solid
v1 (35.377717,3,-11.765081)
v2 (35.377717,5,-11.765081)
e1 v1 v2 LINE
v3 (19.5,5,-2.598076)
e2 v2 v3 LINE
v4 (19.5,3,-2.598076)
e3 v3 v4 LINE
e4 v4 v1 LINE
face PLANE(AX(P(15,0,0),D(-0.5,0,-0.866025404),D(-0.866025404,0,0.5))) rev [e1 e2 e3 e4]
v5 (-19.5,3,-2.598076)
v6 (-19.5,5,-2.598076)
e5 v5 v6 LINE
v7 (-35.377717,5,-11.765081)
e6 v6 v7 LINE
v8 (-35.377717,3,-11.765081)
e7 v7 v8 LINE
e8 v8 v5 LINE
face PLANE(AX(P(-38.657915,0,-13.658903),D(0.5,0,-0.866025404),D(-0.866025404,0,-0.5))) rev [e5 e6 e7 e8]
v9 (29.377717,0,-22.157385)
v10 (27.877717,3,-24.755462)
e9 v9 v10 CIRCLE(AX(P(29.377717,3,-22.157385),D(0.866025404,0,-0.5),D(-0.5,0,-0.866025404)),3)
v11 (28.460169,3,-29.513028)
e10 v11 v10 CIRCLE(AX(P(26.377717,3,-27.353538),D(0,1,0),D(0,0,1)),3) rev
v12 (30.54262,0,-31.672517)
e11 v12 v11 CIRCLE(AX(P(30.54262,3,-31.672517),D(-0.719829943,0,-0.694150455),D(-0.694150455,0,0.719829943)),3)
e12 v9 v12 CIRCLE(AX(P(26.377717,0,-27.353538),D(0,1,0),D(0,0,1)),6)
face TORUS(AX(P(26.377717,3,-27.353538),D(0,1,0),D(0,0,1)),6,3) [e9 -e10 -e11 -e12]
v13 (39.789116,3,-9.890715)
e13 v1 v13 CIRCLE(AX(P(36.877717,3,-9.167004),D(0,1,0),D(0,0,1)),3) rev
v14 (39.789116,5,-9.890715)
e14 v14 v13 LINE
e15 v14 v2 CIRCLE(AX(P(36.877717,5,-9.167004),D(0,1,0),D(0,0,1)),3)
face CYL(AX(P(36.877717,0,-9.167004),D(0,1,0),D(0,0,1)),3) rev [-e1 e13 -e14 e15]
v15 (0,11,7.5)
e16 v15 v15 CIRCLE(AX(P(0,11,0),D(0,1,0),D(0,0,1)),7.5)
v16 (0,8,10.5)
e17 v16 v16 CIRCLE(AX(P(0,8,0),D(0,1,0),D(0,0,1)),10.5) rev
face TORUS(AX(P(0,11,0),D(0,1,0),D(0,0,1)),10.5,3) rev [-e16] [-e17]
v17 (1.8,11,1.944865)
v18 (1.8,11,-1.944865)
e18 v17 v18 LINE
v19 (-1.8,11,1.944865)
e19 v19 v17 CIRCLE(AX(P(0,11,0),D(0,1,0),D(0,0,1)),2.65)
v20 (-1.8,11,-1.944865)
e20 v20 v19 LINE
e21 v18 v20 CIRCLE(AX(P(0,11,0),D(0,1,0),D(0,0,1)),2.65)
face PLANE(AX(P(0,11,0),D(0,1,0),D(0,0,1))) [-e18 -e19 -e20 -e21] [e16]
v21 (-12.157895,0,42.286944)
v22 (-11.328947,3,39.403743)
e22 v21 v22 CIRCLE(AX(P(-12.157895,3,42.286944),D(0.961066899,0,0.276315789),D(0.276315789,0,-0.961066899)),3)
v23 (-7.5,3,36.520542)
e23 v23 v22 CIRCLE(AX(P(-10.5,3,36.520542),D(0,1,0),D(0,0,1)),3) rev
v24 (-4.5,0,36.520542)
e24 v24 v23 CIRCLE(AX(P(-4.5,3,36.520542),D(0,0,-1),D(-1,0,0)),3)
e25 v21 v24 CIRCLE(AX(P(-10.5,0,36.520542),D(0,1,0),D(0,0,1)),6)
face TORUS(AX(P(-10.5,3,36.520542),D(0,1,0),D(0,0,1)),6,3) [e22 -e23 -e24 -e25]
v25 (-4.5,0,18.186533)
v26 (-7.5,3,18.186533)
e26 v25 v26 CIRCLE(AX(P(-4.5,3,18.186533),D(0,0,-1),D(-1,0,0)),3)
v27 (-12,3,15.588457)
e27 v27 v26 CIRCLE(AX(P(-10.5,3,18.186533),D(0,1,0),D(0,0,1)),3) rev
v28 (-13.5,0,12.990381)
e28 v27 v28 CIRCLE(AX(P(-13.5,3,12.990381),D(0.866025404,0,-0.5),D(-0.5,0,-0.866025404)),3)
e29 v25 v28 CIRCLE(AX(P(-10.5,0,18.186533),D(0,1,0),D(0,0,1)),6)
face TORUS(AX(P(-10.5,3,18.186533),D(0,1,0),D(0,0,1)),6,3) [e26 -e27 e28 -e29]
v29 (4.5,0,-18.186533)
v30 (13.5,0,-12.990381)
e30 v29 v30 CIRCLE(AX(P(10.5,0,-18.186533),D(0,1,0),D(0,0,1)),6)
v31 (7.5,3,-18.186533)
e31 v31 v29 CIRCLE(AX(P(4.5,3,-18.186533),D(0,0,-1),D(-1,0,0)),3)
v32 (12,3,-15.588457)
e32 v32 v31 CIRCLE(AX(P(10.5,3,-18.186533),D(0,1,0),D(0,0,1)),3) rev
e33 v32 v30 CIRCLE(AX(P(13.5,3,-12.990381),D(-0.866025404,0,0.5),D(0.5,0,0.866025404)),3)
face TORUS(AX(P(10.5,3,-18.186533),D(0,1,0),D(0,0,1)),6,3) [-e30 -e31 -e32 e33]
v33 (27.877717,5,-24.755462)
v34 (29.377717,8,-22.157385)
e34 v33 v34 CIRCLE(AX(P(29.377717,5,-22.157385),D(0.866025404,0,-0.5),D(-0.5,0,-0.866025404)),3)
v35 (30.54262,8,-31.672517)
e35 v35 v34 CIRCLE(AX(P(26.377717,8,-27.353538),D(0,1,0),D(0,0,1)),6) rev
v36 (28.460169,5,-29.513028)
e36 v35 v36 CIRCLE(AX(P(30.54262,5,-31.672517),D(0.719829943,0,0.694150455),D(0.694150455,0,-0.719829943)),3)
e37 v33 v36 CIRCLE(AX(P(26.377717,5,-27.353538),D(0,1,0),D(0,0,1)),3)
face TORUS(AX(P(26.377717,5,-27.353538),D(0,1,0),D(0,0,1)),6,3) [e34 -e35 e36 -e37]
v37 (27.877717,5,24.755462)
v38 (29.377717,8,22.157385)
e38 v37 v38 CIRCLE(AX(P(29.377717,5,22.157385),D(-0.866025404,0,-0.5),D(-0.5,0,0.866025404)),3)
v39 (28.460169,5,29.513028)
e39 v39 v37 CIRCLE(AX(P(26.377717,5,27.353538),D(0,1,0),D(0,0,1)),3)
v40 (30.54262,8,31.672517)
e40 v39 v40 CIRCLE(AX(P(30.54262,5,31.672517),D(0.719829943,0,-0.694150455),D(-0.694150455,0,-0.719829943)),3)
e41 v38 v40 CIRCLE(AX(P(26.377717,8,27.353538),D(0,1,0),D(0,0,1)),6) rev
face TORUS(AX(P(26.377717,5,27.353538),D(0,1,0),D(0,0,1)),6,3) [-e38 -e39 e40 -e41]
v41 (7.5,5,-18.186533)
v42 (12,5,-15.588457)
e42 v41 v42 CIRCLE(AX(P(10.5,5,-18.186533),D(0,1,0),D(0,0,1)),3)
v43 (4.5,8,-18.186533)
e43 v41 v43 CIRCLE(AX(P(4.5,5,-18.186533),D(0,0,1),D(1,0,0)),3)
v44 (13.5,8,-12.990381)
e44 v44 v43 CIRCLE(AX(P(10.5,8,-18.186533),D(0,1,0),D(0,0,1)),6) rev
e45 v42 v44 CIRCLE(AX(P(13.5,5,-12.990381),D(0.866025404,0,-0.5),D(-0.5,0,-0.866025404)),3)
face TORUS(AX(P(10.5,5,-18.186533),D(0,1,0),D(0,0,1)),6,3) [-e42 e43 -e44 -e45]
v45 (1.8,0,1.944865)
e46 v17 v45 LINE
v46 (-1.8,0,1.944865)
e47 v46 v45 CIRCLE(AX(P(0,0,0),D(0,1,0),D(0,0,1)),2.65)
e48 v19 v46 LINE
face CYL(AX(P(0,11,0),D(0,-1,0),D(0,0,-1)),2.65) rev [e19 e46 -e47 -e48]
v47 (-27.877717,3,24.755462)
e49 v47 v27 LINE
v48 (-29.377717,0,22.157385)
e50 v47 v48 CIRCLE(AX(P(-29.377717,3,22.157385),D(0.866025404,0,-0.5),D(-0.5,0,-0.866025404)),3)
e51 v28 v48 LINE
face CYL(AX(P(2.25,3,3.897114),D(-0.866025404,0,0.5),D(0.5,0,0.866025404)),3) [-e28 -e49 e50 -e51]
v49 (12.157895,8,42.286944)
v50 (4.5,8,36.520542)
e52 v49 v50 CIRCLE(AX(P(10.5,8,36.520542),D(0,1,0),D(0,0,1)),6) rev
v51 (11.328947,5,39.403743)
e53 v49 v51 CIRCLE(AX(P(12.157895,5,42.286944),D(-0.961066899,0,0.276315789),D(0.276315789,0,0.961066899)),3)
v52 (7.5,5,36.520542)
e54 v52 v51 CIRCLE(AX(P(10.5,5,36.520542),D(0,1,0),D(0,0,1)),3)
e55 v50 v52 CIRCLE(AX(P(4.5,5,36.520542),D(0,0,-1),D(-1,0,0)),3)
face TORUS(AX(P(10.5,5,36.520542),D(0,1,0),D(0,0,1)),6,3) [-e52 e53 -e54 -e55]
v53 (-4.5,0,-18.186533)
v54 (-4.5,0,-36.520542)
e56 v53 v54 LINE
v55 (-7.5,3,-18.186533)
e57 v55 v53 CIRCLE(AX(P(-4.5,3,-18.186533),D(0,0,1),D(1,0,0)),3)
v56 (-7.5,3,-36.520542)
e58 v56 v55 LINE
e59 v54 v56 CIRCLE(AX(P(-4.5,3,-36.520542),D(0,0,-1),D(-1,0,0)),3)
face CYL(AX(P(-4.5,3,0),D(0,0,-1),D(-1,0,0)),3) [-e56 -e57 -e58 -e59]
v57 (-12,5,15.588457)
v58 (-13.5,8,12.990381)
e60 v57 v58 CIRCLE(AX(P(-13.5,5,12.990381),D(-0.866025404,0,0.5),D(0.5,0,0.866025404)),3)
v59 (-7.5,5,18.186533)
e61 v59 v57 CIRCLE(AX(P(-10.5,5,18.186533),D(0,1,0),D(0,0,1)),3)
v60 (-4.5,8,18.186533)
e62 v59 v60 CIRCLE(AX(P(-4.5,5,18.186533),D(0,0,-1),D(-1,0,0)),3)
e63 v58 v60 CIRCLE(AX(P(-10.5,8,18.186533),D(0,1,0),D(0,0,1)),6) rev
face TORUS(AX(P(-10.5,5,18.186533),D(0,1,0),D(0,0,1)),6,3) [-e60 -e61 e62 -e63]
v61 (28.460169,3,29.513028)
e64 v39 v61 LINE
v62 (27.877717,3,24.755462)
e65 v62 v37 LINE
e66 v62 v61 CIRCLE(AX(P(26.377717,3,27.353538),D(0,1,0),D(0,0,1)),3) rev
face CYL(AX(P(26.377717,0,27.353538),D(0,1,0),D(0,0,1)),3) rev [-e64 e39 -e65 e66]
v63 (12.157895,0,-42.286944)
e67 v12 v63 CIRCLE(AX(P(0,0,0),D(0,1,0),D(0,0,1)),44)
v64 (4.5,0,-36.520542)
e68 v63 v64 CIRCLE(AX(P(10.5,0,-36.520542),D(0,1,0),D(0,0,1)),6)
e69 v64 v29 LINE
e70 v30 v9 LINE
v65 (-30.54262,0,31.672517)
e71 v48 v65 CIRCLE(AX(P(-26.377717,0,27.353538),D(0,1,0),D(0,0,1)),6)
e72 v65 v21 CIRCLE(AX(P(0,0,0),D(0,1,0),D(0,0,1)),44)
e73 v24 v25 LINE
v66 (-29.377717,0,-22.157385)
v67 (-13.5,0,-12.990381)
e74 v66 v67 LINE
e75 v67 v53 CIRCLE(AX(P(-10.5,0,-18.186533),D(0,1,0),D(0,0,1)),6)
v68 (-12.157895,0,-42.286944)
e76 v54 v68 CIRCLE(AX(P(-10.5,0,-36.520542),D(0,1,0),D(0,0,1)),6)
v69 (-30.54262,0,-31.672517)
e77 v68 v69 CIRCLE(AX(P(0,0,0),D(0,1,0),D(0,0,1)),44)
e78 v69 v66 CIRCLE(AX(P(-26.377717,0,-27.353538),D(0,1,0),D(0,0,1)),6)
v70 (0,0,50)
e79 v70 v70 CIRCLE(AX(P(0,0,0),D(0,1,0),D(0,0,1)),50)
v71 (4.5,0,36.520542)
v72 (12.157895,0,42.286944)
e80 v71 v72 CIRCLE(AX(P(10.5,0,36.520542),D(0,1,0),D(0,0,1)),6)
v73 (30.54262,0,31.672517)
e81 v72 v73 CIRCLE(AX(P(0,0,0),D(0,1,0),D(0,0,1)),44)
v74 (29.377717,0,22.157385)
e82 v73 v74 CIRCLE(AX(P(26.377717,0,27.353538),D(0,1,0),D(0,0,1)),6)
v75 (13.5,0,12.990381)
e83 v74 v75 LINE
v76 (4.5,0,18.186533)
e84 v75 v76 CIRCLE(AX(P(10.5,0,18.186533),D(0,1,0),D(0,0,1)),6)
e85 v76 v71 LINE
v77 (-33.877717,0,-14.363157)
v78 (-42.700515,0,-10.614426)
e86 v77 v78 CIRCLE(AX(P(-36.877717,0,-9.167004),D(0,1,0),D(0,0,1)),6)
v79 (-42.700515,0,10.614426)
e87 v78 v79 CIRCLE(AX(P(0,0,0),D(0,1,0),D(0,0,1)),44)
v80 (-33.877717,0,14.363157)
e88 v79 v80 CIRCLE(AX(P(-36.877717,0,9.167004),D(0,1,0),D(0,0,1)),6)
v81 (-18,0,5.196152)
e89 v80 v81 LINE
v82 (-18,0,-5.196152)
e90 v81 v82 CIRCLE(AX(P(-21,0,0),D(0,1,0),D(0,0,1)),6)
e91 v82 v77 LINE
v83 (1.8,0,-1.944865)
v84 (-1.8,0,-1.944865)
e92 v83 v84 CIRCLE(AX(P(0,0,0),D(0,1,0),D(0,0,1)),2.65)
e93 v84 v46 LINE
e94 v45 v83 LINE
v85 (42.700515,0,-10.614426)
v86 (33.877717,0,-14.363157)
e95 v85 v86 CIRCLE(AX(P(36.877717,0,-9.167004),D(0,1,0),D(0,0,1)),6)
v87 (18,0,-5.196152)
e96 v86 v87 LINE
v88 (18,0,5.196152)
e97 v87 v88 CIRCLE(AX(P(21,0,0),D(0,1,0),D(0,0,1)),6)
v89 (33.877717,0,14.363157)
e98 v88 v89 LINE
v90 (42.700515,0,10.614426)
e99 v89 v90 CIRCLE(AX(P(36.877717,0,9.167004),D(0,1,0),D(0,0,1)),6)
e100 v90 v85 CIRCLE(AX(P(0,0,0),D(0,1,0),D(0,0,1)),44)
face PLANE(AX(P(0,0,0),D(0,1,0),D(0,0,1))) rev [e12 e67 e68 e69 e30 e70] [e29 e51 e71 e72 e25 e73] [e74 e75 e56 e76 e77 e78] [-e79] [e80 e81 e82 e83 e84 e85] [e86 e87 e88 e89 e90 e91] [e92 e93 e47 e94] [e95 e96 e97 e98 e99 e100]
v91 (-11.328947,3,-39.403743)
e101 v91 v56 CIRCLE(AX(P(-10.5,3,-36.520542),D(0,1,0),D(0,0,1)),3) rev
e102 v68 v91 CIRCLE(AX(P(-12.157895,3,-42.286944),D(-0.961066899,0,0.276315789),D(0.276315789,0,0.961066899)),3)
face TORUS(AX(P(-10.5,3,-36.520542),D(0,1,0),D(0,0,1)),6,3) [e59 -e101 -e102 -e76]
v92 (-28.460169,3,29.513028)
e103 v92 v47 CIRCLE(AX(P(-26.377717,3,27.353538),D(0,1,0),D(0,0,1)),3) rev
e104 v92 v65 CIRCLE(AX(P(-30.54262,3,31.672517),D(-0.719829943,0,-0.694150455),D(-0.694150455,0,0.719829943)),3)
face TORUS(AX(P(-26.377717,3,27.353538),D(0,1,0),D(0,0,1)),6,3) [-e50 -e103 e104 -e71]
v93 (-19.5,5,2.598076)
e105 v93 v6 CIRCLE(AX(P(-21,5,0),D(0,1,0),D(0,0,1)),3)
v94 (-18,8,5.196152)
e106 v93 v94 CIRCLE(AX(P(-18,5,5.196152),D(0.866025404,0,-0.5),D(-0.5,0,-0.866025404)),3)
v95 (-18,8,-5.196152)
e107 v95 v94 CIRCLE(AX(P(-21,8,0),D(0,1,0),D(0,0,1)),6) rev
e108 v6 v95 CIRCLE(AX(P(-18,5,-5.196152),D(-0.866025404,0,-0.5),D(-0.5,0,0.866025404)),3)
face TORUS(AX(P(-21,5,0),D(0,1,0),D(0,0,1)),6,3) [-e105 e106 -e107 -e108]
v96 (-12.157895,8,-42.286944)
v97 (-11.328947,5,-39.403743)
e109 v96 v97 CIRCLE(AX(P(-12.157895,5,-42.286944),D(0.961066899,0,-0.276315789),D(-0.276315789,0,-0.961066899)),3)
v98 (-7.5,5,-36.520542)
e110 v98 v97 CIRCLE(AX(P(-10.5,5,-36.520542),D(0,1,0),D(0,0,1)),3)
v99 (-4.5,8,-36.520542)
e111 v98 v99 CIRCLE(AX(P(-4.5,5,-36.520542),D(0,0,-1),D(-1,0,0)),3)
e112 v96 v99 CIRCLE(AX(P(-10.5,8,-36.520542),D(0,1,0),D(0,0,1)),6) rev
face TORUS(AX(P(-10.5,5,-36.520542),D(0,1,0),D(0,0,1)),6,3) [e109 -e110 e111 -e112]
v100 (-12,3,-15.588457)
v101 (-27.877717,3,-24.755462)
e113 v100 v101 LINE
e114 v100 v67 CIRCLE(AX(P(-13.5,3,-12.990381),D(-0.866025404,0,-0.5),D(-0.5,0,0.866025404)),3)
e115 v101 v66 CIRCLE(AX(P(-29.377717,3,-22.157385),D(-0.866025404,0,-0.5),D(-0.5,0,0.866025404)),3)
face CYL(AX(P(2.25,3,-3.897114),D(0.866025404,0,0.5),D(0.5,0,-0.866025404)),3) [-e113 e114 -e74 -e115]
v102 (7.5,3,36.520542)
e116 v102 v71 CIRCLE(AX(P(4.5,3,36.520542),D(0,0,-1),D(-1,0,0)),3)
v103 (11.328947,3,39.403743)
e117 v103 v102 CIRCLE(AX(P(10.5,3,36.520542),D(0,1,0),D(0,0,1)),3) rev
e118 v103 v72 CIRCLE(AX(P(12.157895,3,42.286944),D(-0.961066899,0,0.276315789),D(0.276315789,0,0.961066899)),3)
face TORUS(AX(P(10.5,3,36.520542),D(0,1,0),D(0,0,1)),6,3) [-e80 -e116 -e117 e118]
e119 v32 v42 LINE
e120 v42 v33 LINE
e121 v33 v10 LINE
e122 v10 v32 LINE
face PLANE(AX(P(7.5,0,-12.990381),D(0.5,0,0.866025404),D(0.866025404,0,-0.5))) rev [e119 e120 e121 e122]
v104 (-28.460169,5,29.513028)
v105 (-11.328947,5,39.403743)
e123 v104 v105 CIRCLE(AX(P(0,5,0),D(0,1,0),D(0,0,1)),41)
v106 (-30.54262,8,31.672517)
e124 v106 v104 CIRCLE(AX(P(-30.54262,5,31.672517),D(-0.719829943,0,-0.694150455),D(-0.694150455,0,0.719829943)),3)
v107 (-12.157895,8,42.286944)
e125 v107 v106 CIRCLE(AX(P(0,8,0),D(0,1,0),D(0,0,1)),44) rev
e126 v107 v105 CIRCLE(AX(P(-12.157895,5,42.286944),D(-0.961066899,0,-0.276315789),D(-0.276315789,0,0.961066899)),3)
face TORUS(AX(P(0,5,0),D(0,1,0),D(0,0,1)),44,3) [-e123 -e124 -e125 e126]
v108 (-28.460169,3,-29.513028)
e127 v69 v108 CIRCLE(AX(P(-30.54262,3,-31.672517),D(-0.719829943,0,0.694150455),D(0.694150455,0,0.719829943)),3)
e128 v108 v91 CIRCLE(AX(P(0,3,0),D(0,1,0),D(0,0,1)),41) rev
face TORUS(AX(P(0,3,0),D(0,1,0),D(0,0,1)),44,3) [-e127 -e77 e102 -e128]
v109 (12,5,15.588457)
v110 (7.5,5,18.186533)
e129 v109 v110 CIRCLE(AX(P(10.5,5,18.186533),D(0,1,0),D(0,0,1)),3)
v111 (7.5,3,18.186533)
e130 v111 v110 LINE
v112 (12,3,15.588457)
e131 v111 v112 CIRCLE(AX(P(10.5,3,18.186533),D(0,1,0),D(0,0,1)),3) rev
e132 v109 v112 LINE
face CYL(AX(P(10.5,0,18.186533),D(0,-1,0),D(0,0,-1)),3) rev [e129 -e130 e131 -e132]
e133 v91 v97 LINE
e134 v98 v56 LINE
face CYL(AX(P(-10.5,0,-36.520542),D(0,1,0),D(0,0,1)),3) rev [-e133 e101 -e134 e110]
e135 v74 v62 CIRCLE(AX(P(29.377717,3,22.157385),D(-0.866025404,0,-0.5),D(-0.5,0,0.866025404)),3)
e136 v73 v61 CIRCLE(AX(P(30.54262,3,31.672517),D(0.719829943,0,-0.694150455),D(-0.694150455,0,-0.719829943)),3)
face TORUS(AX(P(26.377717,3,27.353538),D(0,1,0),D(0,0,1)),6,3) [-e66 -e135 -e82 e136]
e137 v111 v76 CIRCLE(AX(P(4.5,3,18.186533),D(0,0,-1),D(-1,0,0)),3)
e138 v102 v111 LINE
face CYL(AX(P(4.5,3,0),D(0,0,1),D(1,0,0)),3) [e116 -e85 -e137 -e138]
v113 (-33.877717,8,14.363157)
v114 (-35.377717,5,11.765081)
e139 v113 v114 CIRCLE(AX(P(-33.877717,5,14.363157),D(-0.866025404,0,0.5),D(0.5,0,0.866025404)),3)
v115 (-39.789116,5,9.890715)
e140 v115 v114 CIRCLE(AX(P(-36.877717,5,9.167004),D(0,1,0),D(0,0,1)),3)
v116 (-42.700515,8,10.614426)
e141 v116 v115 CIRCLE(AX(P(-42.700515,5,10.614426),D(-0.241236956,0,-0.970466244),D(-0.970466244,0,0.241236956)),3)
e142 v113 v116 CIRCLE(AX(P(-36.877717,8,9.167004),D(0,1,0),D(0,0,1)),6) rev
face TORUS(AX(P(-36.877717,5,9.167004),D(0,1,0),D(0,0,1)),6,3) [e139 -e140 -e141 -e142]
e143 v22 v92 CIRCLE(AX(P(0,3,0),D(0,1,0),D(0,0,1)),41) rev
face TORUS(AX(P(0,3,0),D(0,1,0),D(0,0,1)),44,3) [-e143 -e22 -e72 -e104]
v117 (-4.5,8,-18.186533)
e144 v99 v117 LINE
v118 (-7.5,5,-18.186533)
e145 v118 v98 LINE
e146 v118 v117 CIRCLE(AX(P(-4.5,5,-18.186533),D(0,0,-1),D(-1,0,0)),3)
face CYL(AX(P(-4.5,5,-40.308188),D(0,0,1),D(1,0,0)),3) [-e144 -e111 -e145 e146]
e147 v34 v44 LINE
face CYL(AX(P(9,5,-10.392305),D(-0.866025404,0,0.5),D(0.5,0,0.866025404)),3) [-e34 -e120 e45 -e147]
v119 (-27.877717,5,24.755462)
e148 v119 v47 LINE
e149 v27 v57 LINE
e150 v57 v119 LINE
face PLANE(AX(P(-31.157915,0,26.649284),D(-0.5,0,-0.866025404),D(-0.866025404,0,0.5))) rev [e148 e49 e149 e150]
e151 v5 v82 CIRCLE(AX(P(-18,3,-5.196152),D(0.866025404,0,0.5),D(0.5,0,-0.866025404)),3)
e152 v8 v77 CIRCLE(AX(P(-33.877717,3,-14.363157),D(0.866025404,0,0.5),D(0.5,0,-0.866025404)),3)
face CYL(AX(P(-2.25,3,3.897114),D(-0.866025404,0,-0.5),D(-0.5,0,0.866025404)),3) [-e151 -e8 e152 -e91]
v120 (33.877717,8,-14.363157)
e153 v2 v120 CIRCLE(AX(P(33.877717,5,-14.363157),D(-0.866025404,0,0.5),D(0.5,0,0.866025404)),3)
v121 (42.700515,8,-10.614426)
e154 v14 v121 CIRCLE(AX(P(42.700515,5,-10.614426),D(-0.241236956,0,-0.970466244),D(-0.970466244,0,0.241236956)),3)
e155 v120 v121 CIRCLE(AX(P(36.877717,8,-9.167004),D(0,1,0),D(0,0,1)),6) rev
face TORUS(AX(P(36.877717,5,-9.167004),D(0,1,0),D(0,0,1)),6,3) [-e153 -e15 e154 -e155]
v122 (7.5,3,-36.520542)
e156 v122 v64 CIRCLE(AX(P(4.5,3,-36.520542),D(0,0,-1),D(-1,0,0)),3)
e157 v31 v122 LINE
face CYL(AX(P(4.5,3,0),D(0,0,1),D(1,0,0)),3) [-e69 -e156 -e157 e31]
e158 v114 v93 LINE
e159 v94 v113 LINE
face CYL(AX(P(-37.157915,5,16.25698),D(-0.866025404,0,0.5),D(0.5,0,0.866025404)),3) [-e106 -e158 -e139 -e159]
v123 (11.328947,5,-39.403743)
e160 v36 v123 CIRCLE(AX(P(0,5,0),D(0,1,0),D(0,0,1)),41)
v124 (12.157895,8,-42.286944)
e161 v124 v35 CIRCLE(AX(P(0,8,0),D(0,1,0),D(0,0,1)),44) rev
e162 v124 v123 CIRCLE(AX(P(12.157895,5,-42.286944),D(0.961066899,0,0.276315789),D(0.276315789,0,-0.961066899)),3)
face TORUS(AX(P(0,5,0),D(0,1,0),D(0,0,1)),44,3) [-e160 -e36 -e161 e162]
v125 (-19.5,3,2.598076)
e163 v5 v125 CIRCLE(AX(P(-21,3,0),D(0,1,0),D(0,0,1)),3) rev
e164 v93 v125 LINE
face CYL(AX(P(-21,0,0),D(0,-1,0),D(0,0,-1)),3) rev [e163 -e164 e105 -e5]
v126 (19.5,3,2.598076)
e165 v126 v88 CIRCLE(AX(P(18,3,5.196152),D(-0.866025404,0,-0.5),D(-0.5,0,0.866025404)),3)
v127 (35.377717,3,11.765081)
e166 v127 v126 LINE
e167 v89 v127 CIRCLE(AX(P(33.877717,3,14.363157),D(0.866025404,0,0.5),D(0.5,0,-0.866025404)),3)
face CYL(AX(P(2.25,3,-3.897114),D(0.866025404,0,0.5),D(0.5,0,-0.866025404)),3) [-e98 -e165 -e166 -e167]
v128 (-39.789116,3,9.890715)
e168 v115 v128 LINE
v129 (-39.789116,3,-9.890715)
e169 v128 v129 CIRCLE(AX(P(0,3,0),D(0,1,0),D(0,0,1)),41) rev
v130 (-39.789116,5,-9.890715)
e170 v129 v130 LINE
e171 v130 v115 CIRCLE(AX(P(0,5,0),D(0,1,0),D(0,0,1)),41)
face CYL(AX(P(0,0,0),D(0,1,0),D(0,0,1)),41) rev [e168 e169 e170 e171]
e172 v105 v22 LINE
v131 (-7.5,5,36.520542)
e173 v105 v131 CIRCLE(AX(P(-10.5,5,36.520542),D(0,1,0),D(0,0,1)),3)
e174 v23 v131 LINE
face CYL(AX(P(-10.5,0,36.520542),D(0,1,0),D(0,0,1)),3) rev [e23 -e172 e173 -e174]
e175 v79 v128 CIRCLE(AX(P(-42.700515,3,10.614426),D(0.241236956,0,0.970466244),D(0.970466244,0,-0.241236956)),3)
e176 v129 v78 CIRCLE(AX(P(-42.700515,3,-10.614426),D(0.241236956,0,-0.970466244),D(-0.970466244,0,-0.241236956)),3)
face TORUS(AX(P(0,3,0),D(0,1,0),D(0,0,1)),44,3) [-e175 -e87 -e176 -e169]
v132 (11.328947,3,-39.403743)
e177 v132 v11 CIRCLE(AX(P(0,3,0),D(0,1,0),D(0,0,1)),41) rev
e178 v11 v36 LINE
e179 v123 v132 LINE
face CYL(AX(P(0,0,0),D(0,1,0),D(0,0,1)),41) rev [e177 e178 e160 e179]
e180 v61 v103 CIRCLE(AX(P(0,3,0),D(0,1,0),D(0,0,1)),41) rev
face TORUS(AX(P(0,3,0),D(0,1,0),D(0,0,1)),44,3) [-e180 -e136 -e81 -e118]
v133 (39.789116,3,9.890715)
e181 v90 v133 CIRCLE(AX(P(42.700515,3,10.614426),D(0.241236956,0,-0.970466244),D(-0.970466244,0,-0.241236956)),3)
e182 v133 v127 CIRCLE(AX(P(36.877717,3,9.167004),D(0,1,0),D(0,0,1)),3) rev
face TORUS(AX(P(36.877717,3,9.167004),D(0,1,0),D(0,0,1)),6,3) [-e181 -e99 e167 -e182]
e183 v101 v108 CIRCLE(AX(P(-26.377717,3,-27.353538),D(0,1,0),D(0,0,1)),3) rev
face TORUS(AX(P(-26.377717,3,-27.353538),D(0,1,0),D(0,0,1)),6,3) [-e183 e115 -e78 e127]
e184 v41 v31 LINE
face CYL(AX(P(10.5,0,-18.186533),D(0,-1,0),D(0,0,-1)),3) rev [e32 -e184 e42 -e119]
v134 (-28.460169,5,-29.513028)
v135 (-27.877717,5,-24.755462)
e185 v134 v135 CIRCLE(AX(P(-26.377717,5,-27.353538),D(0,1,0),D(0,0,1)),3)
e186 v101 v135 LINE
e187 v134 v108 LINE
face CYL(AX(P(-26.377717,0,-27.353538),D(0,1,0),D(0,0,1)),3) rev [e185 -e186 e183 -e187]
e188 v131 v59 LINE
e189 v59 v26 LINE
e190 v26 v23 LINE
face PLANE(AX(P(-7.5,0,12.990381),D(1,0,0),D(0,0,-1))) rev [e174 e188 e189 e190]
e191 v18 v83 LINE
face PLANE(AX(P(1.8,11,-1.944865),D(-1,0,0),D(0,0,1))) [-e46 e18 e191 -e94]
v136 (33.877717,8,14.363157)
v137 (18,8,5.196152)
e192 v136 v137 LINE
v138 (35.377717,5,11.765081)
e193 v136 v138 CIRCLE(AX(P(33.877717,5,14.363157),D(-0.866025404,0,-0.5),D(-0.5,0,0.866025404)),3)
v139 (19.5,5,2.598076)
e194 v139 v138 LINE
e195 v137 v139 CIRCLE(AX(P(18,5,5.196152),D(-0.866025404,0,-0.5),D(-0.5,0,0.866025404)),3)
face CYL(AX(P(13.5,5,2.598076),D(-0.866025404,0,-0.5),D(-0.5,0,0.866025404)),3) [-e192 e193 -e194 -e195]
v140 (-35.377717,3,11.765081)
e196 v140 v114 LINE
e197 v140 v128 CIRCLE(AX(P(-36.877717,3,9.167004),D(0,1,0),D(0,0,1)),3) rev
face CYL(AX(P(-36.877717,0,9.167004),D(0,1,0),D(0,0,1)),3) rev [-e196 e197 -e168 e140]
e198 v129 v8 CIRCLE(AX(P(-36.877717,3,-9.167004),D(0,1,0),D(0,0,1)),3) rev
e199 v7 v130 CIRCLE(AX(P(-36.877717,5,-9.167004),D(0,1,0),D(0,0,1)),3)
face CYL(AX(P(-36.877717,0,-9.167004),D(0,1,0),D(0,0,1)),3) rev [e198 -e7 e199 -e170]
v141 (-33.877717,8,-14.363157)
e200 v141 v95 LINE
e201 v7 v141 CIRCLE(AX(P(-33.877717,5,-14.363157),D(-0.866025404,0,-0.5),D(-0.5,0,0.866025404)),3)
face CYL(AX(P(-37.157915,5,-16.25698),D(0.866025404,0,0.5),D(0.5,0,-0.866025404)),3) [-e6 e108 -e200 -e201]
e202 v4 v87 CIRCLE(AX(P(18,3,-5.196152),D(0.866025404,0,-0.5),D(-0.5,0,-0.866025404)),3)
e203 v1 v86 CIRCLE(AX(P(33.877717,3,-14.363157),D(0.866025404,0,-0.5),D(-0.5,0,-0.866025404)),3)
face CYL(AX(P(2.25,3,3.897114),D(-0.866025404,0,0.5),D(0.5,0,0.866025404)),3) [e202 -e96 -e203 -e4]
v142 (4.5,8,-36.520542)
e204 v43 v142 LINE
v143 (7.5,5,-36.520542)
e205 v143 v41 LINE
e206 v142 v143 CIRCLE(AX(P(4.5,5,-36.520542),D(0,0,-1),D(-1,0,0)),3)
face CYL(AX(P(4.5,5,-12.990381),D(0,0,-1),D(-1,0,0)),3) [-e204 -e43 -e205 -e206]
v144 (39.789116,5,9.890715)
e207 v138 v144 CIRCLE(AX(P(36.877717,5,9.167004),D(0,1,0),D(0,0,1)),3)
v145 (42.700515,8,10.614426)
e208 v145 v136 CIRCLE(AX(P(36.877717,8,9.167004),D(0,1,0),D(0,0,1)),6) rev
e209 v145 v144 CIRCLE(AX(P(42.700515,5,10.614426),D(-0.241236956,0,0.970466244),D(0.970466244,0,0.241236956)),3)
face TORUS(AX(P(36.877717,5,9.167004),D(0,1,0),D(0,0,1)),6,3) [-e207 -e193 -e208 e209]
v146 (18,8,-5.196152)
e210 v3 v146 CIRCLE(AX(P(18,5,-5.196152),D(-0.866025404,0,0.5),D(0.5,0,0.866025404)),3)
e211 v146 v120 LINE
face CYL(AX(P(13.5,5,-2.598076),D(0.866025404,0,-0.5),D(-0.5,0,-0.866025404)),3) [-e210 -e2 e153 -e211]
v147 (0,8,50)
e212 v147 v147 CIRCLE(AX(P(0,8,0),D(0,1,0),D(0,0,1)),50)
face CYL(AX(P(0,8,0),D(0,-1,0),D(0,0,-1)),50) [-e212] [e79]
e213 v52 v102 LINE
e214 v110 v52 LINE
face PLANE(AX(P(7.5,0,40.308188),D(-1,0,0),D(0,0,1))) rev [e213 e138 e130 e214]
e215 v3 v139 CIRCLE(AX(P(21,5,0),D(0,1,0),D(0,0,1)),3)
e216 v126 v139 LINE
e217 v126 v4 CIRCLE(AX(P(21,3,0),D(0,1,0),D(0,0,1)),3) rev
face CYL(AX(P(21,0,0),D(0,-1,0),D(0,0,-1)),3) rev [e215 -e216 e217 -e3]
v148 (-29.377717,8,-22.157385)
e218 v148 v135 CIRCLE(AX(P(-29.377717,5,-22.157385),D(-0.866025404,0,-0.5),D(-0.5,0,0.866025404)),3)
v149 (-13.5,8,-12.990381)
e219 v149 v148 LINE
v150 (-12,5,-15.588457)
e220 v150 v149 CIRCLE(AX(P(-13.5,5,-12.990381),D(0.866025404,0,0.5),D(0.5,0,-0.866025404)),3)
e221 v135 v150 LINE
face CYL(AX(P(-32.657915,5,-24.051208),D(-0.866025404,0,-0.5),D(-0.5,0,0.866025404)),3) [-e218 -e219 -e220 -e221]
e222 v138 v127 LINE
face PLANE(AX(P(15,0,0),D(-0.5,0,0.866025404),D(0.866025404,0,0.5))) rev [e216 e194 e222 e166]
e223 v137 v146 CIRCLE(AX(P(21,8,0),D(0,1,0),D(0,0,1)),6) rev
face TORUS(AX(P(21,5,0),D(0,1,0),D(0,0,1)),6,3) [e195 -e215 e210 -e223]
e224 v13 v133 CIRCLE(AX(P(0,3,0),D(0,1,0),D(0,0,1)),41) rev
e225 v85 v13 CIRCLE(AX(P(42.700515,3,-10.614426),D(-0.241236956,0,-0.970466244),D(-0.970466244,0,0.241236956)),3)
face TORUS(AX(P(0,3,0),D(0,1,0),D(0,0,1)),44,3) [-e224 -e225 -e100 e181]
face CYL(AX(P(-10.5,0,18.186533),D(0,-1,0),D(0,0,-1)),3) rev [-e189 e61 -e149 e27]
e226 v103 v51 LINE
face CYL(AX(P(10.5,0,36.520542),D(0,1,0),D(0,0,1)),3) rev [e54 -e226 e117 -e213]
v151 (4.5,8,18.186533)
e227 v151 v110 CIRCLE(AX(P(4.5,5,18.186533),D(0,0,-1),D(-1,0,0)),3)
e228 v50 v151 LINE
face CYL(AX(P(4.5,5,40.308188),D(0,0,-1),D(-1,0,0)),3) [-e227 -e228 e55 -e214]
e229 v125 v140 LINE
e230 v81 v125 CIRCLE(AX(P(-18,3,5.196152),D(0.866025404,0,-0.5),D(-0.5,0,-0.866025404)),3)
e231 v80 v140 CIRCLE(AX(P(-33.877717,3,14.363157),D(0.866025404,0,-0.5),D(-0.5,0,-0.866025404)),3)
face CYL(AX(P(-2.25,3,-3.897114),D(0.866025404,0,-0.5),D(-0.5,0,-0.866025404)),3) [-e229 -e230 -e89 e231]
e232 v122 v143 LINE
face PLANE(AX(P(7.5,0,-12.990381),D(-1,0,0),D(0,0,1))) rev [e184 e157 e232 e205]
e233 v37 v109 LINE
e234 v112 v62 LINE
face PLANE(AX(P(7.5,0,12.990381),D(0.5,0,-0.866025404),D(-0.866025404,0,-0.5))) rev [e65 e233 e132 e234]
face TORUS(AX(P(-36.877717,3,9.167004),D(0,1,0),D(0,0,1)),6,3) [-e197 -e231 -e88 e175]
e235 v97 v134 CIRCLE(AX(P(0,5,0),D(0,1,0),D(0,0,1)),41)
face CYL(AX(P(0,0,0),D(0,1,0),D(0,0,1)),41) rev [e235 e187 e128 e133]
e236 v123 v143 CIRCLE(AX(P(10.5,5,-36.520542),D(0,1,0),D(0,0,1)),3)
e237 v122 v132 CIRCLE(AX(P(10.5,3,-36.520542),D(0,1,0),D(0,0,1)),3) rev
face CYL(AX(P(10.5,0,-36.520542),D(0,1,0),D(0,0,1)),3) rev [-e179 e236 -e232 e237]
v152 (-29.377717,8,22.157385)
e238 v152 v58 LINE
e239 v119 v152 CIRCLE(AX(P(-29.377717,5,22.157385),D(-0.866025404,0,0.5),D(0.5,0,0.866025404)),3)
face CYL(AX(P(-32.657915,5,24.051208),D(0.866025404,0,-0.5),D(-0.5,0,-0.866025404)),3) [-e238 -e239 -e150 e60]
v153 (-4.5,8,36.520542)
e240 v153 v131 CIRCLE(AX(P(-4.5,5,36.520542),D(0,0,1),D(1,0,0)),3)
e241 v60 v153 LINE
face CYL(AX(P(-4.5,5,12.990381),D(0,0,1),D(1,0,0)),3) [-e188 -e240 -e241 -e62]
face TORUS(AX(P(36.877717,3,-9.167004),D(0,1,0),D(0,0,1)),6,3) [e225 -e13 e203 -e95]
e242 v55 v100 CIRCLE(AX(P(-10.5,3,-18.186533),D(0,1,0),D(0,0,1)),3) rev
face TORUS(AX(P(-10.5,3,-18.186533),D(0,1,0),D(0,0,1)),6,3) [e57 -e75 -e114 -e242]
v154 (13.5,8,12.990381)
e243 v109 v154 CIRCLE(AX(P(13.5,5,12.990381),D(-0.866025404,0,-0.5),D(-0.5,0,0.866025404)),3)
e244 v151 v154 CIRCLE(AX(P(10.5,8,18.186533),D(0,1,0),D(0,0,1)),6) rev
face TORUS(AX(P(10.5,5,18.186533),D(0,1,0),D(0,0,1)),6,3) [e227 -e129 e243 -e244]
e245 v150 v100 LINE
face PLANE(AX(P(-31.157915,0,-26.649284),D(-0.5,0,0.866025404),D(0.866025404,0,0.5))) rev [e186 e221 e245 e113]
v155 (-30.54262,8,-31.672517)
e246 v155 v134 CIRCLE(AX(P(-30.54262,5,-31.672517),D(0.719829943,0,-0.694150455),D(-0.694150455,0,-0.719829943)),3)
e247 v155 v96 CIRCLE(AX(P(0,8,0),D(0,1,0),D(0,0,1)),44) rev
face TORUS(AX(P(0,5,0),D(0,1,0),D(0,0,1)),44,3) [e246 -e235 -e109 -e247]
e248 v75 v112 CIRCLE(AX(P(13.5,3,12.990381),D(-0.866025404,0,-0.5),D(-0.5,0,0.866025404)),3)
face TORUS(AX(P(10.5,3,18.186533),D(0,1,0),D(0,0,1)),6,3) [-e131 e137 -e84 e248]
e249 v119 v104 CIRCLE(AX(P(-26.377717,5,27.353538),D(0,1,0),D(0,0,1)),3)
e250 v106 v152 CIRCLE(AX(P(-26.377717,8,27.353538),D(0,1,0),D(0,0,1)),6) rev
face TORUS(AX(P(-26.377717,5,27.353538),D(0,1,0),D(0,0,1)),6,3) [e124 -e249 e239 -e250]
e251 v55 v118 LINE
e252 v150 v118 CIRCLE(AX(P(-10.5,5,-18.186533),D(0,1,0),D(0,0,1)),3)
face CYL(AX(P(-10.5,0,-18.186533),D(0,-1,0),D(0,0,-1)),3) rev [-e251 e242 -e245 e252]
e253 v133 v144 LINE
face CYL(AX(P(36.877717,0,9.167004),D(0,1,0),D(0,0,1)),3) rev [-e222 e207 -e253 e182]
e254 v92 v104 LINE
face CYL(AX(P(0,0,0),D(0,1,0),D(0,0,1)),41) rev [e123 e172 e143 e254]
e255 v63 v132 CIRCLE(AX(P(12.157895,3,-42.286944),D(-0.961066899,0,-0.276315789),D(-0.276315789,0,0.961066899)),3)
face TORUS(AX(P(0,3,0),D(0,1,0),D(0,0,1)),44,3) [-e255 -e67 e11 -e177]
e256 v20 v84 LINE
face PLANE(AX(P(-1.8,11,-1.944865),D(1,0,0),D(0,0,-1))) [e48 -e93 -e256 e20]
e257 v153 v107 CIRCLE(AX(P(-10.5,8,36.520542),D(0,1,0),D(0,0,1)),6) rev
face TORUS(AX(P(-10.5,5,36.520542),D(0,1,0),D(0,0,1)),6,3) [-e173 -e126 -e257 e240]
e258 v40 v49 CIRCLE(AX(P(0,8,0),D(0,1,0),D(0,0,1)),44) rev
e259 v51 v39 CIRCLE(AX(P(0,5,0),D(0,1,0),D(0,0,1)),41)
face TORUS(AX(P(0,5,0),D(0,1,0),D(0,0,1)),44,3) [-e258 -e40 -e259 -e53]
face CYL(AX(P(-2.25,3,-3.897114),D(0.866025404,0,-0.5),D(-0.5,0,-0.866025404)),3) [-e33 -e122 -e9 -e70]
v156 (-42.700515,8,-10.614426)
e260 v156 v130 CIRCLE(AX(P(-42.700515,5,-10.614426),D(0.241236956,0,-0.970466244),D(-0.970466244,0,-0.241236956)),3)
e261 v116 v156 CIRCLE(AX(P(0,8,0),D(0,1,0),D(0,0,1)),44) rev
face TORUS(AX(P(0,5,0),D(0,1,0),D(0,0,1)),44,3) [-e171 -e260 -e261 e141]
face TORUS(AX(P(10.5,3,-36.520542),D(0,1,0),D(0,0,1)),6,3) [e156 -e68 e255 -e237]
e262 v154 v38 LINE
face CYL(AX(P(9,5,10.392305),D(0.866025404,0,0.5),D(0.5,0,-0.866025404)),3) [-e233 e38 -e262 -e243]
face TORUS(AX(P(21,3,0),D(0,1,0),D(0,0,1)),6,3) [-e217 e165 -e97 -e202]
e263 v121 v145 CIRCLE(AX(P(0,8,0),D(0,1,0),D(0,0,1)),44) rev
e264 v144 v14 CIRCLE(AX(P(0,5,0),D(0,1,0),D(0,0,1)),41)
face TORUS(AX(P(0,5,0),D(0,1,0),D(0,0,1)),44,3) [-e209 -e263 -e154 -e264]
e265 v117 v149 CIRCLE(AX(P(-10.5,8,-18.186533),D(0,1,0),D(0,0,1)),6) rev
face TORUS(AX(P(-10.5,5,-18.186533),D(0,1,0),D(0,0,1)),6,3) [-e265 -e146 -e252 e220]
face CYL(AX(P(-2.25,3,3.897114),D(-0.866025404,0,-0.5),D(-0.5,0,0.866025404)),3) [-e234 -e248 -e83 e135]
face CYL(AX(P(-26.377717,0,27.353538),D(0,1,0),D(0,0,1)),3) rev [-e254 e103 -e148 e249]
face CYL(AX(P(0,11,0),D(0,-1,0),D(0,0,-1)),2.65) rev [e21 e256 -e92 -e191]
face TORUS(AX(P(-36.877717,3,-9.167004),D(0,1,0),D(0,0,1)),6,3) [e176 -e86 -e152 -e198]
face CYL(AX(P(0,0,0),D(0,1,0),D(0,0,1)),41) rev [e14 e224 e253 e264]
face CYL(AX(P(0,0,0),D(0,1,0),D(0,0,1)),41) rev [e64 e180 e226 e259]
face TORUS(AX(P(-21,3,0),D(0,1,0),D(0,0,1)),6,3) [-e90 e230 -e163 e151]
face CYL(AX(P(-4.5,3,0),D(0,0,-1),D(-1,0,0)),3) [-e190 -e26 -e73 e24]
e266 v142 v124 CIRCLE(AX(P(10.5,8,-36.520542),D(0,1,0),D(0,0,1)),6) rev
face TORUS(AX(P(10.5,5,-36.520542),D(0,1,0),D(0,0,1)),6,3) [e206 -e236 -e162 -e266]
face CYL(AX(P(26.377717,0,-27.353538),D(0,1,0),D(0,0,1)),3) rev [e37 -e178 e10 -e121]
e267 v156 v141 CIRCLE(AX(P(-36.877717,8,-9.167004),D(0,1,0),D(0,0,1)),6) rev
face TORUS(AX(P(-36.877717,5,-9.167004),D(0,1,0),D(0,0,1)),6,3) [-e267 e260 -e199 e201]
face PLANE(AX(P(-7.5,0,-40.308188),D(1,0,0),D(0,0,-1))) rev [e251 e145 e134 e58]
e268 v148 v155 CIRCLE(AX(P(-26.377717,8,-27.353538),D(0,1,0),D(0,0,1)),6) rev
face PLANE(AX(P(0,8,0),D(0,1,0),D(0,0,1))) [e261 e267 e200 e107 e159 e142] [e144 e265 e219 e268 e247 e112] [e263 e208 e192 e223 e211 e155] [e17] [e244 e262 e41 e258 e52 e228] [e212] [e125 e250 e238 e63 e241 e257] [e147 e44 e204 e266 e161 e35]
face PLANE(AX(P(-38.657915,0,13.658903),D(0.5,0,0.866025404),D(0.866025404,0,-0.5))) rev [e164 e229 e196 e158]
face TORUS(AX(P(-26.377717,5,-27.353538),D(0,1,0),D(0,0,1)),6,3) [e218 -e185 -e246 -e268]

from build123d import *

# Parameters (mm, degrees)
SKETCH1_R           = 50
BOSS_EXTRUDE1_DEPTH = 8
SKETCH2_R           = 7.5
BOSS_EXTRUDE4_DEPTH = 3
CUT_EXTRUDE4_DEPTH  = 72.161787499
CUT_EXTRUDE6_DEPTH  = 72.161787499
FILLET4_R           = 3
FILLET5_R           = 3
FILLET6_R           = 3
FILLET7_R           = 3
FILLET8_R           = 3


with BuildPart() as part:
    # Sketch1 → Boss-Extrude1 (new body)
    with BuildSketch(Plane(origin=(0, 0, 0), x_dir=(1, 0, 0), z_dir=(0, 1, 0))):
        with Locations(Location((0, 0, 0), (0, 0, 270))):
            Circle(SKETCH1_R)
    extrude(amount=BOSS_EXTRUDE1_DEPTH)

    # Sketch2 → Boss-Extrude4 (add)
    with BuildSketch(Plane(origin=(0, 8, 0), x_dir=(1, 0, 0), z_dir=(0, 1, 0))):
        with Locations(Location((0, 0, 0), (0, 0, 270))):
            Circle(SKETCH2_R)
        with BuildLine():
            Line((-1.8, 1.944865034), (-1.8, -1.944865034))
            ThreePointArc((-1.8, -1.944865034), (0, -2.65), (1.8, -1.944865034))
            Line((1.8, -1.944865034), (1.8, 1.944865034))
            ThreePointArc((1.8, 1.944865034), (0, 2.65), (-1.8, 1.944865034))
        make_face(mode=Mode.SUBTRACT)
    extrude(amount=BOSS_EXTRUDE4_DEPTH)

    # Sketch5 → Cut-Extrude4 (cut, through all)
    with BuildSketch(Plane(origin=(0, 8, 0), x_dir=(1, 0, 0), z_dir=(0, 1, 0))):
        with BuildLine():
            Line((-1.8, 1.944865034), (-1.8, -1.944865034))
            ThreePointArc((-1.8, -1.944865034), (0, -2.65), (1.8, -1.944865034))
            Line((1.8, -1.944865034), (1.8, 1.944865034))
            ThreePointArc((1.8, 1.944865034), (0, 2.65), (-1.8, 1.944865034))
        make_face()
    extrude(amount=-CUT_EXTRUDE4_DEPTH, mode=Mode.SUBTRACT)

    # Sketch7 → Cut-Extrude6 (cut, through all)
    with BuildSketch(Plane(origin=(0, 8, 0), x_dir=(1, 0, 0), z_dir=(0, 1, 0))):
        with BuildLine():
            Line((-7.5, 40.308187754), (-7.5, 12.990381057))
            Line((-7.5, 12.990381057), (-31.157914575, 26.649284405))
            ThreePointArc((-31.157914575, 26.649284405), (-20.5, 35.507041555), (-7.5, 40.308187754))
        make_face()
        with BuildLine():
            Line((7.5, -40.308187754), (7.5, -12.990381057))
            Line((7.5, -12.990381057), (31.157914575, -26.649284405))
            ThreePointArc((31.157914575, -26.649284405), (20.5, -35.507041555), (7.5, -40.308187754))
        make_face()
        with BuildLine():
            Line((-38.657914575, 13.658903349), (-15, 0))
            Line((-15, 0), (-38.657914575, -13.658903349))
            ThreePointArc((-38.657914575, -13.658903349), (-41, 0), (-38.657914575, 13.658903349))
        make_face()
        with BuildLine():
            Line((-31.157914575, -26.649284405), (-7.5, -12.990381057))
            Line((-7.5, -12.990381057), (-7.5, -40.308187754))
            ThreePointArc((-7.5, -40.308187754), (-20.5, -35.507041555), (-31.157914575, -26.649284405))
        make_face()
        with BuildLine():
            Line((7.5, 12.990381057), (31.157914575, 26.649284405))
            ThreePointArc((31.157914575, 26.649284405), (20.5, 35.507041555), (7.5, 40.308187754))
            Line((7.5, 40.308187754), (7.5, 12.990381057))
        make_face()
        with BuildLine():
            Line((15, 0), (38.657914575, -13.658903349))
            ThreePointArc((38.657914575, -13.658903349), (41, 0), (38.657914575, 13.658903349))
            Line((38.657914575, 13.658903349), (15, 0))
        make_face()
    extrude(amount=-CUT_EXTRUDE6_DEPTH, mode=Mode.SUBTRACT)

    # Fillet4
    fillet4_edges = [part.edges().sort_by_distance(p)[0] for p in [
        (0, 8, -7.5),
    ]]
    fillet(fillet4_edges, radius=FILLET4_R - 0.0001)  # a hair under: the kernel refuses the full size

    # Fillet5
    fillet5_edges = [part.edges().sort_by_distance(p)[0] for p in [
        (7.5, 4, -40.308187754),
        (31.157914575, 4, -26.649284405),
        (31.157914575, 4, 26.649284405),
        (7.5, 4, 40.308187754),
        (38.657914575, 4, -13.658903349),
        (38.657914575, 4, 13.658903349),
        (-38.657914575, 4, 13.658903349),
        (-38.657914575, 4, -13.658903349),
        (-31.157914575, 4, -26.649284405),
        (-7.5, 4, -40.308187754),
        (-7.5, 4, 40.308187754),
        (-31.157914575, 4, 26.649284405),
    ]]
    fillet(fillet5_edges, radius=FILLET5_R)

    # Fillet6
    fillet6_edges = [part.edges().sort_by_distance(p)[0] for p in [
        (7.5, 4, -12.990381057),
        (7.5, 4, 12.990381057),
        (15, 4, 0),
        (-15, 4, 0),
        (-7.5, 4, -12.990381057),
        (-7.5, 4, 12.990381057),
    ]]
    fillet(fillet6_edges, radius=FILLET6_R)

    # Fillet7
    fillet7_edges = [part.edges().sort_by_distance(p)[0] for p in [
        (-19.938858637, 8, -20.171959439),
        (-20.5, 8, -35.507041555),
        (-20.5, 8, 35.507041555),
        (-41, 8, 0),
        (7.5, 8, -27.353537822),
        (20.5, 8, -35.507041555),
        (27.438858637, 8, -7.181578383),
        (41, 8, 0),
        (19.938858637, 8, 20.171959439),
        (20.5, 8, 35.507041555),
        (-7.5, 8, 27.353537822),
        (-27.438858637, 8, 7.181578383),
        (-29.355484575, 8, -26.988980691),
        (-29.355484575, 8, 26.988980691),
        (-38.050885189, 8, -11.928105037),
        (-8.695400613, 8, -38.917085728),
        (8.695400613, 8, -38.917085728),
        (38.050885189, 8, -11.928105037),
        (29.355484575, 8, 26.988980691),
        (-8.695400613, 8, 38.917085728),
        (-38.050885189, 8, 11.928105037),
        (8.695400613, 8, 38.917085728),
        (38.050885189, 8, 11.928105037),
        (29.355484575, 8, -26.988980691),
        (-27.438858637, 8, -7.181578383),
        (-19.938858637, 8, 20.171959439),
        (7.5, 8, 27.353537822),
        (27.438858637, 8, 7.181578383),
        (19.938858637, 8, -20.171959439),
        (-7.5, 8, -27.353537822),
        (-18, 8, 0),
        (-9, 8, 15.588457268),
        (9, 8, 15.588457268),
        (18, 8, 0),
        (9, 8, -15.588457268),
        (-9, 8, -15.588457268),
    ]]
    fillet(fillet7_edges, radius=FILLET7_R)

    # Fillet8
    fillet8_edges = [part.edges().sort_by_distance(p)[0] for p in [
        (-19.938858637, 0, -20.171959439),
        (-20.5, 0, -35.507041555),
        (-20.5, 0, 35.507041555),
        (-41, 0, 0),
        (7.5, 0, -27.353537822),
        (20.5, 0, -35.507041555),
        (27.438858637, 0, -7.181578383),
        (41, 0, 0),
        (19.938858637, 0, 20.171959439),
        (20.5, 0, 35.507041555),
        (-7.5, 0, 27.353537822),
        (-27.438858637, 0, 7.181578383),
        (-29.355484575, 0, -26.988980691),
        (-29.355484575, 0, 26.988980691),
        (-38.050885189, 0, -11.928105037),
        (-8.695400613, 0, -38.917085728),
        (8.695400613, 0, -38.917085728),
        (38.050885189, 0, -11.928105037),
        (29.355484575, 0, 26.988980691),
        (-8.695400613, 0, 38.917085728),
        (-38.050885189, 0, 11.928105037),
        (8.695400613, 0, 38.917085728),
        (38.050885189, 0, 11.928105037),
        (29.355484575, 0, -26.988980691),
        (-27.438858637, 0, -7.181578383),
        (-19.938858637, 0, 20.171959439),
        (7.5, 0, 27.353537822),
        (27.438858637, 0, 7.181578383),
        (19.938858637, 0, -20.171959439),
        (-7.5, 0, -27.353537822),
        (-18, 0, 0),
        (-9, 0, 15.588457268),
        (9, 0, 15.588457268),
        (18, 0, 0),
        (9, 0, -15.588457268),
        (-9, 0, -15.588457268),
    ]]
    fillet(fillet8_edges, radius=FILLET8_R)


solid = part.part
